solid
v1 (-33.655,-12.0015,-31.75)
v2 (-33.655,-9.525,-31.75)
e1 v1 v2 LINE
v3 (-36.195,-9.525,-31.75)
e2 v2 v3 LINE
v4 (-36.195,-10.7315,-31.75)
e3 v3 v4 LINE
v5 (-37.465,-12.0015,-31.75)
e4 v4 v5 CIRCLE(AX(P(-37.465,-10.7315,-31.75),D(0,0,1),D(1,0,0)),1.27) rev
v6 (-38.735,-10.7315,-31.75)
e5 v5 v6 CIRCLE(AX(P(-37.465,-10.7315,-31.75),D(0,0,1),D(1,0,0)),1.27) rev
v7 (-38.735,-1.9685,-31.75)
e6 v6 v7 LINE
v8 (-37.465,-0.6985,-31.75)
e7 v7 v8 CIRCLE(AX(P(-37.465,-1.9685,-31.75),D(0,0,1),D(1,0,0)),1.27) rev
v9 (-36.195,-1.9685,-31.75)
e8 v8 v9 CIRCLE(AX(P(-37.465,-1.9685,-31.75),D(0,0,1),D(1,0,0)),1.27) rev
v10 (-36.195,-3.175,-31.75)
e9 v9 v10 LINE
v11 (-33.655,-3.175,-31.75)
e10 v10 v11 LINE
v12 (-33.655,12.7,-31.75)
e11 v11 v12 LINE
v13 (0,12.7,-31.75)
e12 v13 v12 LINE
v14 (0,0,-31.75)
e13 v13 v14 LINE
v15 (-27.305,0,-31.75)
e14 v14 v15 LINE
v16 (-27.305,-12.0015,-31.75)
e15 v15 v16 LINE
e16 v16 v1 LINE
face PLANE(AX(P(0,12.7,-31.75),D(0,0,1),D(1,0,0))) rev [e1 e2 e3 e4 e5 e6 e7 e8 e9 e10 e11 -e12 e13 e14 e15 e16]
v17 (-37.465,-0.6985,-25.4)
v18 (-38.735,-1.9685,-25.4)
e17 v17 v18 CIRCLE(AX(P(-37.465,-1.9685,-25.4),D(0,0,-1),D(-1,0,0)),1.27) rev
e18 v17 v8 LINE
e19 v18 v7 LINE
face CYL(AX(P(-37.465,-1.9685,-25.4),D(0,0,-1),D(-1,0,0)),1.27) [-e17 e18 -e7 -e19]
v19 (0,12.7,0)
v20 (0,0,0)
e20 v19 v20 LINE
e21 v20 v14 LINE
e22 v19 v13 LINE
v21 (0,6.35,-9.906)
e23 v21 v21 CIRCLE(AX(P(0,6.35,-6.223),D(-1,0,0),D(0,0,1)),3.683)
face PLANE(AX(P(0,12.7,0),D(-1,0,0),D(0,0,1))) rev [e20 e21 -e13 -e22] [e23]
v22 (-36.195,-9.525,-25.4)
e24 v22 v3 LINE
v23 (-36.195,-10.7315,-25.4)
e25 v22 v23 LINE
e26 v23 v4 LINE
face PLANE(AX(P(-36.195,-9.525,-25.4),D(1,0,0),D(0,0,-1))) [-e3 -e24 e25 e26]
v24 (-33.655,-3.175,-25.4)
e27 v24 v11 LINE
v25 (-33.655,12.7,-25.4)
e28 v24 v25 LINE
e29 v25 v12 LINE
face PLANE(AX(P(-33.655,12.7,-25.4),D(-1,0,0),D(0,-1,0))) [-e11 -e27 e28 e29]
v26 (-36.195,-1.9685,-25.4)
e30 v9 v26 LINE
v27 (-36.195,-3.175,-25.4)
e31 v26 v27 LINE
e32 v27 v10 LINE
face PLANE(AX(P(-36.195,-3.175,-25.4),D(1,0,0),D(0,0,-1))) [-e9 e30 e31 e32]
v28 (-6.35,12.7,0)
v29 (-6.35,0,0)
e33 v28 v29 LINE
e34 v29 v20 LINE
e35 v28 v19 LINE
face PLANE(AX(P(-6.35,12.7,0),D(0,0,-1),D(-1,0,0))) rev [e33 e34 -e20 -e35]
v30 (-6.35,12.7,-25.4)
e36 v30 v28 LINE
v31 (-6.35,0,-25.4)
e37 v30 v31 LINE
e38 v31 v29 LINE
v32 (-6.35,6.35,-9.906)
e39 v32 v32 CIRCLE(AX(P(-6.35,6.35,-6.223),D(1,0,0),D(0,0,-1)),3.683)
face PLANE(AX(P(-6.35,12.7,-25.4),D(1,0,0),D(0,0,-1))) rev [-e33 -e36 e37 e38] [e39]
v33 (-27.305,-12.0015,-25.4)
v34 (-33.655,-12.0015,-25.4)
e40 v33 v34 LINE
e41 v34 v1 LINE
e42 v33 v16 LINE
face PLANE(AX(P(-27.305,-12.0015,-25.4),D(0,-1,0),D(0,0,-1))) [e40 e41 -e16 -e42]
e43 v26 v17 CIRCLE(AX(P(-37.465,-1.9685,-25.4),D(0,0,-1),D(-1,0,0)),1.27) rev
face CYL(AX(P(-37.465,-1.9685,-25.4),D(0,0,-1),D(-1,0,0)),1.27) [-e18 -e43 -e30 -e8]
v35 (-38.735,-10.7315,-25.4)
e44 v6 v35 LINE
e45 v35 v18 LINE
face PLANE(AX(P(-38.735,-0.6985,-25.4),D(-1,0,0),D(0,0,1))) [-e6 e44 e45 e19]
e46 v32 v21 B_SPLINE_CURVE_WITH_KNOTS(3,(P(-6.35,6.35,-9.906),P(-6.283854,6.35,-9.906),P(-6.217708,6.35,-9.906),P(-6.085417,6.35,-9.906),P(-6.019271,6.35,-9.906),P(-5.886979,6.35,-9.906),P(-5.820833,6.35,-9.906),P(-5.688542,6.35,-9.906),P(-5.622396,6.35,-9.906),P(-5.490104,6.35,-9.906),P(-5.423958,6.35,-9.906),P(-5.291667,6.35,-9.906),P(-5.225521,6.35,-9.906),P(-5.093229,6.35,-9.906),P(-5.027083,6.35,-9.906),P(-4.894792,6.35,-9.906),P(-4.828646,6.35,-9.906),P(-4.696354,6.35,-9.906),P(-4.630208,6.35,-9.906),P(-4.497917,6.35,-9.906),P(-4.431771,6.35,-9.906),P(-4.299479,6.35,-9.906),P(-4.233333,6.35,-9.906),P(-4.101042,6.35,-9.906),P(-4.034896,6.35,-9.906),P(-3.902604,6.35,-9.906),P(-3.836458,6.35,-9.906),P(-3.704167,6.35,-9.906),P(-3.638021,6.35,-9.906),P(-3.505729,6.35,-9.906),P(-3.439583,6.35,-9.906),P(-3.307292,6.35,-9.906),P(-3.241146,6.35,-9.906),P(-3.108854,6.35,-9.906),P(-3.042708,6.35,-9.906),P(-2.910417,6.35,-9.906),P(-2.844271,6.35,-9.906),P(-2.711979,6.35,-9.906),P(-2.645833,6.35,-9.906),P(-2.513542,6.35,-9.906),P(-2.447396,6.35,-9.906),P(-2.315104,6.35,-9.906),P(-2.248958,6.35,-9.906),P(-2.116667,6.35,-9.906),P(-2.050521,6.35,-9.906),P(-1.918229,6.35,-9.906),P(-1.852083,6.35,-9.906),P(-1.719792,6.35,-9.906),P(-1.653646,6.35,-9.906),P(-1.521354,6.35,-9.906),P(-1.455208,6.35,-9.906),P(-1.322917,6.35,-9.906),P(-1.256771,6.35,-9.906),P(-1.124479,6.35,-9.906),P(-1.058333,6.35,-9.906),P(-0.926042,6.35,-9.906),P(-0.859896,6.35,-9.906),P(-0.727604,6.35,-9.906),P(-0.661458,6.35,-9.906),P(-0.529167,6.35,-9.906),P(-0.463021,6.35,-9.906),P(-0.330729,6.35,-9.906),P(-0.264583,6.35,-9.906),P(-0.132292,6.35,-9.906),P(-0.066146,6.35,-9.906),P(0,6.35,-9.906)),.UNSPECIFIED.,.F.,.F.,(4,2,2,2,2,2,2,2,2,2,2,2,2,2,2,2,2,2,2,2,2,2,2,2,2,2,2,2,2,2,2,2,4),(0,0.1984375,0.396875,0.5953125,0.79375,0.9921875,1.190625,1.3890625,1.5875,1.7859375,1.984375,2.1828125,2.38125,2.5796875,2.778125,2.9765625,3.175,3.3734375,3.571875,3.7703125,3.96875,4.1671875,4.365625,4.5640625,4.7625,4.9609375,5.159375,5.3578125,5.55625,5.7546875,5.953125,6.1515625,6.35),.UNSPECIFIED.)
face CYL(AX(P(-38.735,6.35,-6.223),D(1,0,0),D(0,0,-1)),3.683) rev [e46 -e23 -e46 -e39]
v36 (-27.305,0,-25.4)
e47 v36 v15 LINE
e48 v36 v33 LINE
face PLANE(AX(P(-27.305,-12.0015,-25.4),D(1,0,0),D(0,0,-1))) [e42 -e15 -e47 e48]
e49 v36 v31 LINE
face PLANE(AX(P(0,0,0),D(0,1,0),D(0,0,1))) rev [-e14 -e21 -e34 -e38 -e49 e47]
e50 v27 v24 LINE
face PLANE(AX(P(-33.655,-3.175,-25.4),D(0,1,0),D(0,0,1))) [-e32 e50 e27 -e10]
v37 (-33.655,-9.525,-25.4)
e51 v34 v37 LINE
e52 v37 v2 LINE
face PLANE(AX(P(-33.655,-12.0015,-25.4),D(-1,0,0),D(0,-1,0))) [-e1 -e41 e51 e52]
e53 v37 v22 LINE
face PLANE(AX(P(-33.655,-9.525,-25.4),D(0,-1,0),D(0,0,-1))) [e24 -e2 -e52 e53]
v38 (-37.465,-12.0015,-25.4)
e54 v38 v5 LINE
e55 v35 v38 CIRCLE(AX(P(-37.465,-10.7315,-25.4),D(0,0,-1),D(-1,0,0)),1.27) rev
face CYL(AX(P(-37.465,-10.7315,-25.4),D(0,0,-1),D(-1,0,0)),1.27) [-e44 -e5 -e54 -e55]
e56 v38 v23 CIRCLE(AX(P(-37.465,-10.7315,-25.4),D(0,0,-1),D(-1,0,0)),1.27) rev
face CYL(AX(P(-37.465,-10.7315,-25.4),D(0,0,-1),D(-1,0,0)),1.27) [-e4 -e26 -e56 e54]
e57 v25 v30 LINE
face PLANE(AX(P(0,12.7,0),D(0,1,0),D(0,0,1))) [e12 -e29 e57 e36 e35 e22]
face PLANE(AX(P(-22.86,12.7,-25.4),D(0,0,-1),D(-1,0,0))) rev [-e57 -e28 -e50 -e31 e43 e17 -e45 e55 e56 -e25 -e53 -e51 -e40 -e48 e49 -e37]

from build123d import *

# Parameters (mm, degrees)
BOSS_EXTRUDE1_DEPTH     = 12.7
BOSS_EXTRUDE2_DEPTH     = 6.35
FILLET1_R               = 1.27
FILLET2_R               = 1.27
CUT_EXTRUDE1_DEPTH      = 52.669649941
CUT_EXTRUDE1_DEPTH_BACK = 52.669649941
SKETCH5_R               = 3.683


with BuildPart() as part:
    # Sketch1 → Boss-Extrude1 (new body)
    with BuildSketch(Plane(origin=(0, 0, 0), x_dir=(1, 0, 0), z_dir=(0, 1, 0))):
        Polygon((0, 0), (0, 31.75), (-22.86, 31.75), (-22.86, 25.4), (-6.35, 25.4), (-6.35, 0), align=None)
    extrude(amount=BOSS_EXTRUDE1_DEPTH)

    # Sketch3 → Boss-Extrude2 (add)
    with BuildSketch(Plane(origin=(0, 0, -31.75), x_dir=(-1, 0, 0), z_dir=(0, 0, -1))):
        Polygon((22.86, 12.7), (33.655, 12.7), (33.655, -3.175), (36.195, -3.175), (36.195, -0.6985), (38.735, -0.6985), (38.735, -12.0015), (36.195, -12.0015), (36.195, -9.525), (33.655, -9.525), (33.655, -12.0015), (27.305, -12.0015), (27.305, 0), (22.86, 0), align=None)
    extrude(amount=-BOSS_EXTRUDE2_DEPTH)

    # Fillet1
    fillet1_edges = [part.edges().sort_by_distance(p)[0] for p in [
        (-36.195, -0.6985, -28.575),
    ]]
    fillet(fillet1_edges, radius=FILLET1_R)

    # Fillet2
    fillet2_edges = [part.edges().sort_by_distance(p)[0] for p in [
        (-36.195, -12.0015, -28.575),
        (-38.735, -12.0015, -28.575),
        (-38.735, -0.6985, -28.575),
    ]]
    fillet(fillet2_edges, radius=FILLET2_R - 0.0001)  # a hair under: the kernel refuses the full size

    # Sketch5 → Cut-Extrude1 (cut, two sides: drawn at the far end of the back side and taken through both)
    with BuildSketch(Plane(origin=(0, 0, 0), x_dir=(0, 0, -1), z_dir=(1, 0, 0)).offset(-CUT_EXTRUDE1_DEPTH_BACK)):
        with Locations((6.223, 6.35)):
            Circle(SKETCH5_R)
    extrude(amount=CUT_EXTRUDE1_DEPTH + CUT_EXTRUDE1_DEPTH_BACK, mode=Mode.SUBTRACT)


solid = part.part
